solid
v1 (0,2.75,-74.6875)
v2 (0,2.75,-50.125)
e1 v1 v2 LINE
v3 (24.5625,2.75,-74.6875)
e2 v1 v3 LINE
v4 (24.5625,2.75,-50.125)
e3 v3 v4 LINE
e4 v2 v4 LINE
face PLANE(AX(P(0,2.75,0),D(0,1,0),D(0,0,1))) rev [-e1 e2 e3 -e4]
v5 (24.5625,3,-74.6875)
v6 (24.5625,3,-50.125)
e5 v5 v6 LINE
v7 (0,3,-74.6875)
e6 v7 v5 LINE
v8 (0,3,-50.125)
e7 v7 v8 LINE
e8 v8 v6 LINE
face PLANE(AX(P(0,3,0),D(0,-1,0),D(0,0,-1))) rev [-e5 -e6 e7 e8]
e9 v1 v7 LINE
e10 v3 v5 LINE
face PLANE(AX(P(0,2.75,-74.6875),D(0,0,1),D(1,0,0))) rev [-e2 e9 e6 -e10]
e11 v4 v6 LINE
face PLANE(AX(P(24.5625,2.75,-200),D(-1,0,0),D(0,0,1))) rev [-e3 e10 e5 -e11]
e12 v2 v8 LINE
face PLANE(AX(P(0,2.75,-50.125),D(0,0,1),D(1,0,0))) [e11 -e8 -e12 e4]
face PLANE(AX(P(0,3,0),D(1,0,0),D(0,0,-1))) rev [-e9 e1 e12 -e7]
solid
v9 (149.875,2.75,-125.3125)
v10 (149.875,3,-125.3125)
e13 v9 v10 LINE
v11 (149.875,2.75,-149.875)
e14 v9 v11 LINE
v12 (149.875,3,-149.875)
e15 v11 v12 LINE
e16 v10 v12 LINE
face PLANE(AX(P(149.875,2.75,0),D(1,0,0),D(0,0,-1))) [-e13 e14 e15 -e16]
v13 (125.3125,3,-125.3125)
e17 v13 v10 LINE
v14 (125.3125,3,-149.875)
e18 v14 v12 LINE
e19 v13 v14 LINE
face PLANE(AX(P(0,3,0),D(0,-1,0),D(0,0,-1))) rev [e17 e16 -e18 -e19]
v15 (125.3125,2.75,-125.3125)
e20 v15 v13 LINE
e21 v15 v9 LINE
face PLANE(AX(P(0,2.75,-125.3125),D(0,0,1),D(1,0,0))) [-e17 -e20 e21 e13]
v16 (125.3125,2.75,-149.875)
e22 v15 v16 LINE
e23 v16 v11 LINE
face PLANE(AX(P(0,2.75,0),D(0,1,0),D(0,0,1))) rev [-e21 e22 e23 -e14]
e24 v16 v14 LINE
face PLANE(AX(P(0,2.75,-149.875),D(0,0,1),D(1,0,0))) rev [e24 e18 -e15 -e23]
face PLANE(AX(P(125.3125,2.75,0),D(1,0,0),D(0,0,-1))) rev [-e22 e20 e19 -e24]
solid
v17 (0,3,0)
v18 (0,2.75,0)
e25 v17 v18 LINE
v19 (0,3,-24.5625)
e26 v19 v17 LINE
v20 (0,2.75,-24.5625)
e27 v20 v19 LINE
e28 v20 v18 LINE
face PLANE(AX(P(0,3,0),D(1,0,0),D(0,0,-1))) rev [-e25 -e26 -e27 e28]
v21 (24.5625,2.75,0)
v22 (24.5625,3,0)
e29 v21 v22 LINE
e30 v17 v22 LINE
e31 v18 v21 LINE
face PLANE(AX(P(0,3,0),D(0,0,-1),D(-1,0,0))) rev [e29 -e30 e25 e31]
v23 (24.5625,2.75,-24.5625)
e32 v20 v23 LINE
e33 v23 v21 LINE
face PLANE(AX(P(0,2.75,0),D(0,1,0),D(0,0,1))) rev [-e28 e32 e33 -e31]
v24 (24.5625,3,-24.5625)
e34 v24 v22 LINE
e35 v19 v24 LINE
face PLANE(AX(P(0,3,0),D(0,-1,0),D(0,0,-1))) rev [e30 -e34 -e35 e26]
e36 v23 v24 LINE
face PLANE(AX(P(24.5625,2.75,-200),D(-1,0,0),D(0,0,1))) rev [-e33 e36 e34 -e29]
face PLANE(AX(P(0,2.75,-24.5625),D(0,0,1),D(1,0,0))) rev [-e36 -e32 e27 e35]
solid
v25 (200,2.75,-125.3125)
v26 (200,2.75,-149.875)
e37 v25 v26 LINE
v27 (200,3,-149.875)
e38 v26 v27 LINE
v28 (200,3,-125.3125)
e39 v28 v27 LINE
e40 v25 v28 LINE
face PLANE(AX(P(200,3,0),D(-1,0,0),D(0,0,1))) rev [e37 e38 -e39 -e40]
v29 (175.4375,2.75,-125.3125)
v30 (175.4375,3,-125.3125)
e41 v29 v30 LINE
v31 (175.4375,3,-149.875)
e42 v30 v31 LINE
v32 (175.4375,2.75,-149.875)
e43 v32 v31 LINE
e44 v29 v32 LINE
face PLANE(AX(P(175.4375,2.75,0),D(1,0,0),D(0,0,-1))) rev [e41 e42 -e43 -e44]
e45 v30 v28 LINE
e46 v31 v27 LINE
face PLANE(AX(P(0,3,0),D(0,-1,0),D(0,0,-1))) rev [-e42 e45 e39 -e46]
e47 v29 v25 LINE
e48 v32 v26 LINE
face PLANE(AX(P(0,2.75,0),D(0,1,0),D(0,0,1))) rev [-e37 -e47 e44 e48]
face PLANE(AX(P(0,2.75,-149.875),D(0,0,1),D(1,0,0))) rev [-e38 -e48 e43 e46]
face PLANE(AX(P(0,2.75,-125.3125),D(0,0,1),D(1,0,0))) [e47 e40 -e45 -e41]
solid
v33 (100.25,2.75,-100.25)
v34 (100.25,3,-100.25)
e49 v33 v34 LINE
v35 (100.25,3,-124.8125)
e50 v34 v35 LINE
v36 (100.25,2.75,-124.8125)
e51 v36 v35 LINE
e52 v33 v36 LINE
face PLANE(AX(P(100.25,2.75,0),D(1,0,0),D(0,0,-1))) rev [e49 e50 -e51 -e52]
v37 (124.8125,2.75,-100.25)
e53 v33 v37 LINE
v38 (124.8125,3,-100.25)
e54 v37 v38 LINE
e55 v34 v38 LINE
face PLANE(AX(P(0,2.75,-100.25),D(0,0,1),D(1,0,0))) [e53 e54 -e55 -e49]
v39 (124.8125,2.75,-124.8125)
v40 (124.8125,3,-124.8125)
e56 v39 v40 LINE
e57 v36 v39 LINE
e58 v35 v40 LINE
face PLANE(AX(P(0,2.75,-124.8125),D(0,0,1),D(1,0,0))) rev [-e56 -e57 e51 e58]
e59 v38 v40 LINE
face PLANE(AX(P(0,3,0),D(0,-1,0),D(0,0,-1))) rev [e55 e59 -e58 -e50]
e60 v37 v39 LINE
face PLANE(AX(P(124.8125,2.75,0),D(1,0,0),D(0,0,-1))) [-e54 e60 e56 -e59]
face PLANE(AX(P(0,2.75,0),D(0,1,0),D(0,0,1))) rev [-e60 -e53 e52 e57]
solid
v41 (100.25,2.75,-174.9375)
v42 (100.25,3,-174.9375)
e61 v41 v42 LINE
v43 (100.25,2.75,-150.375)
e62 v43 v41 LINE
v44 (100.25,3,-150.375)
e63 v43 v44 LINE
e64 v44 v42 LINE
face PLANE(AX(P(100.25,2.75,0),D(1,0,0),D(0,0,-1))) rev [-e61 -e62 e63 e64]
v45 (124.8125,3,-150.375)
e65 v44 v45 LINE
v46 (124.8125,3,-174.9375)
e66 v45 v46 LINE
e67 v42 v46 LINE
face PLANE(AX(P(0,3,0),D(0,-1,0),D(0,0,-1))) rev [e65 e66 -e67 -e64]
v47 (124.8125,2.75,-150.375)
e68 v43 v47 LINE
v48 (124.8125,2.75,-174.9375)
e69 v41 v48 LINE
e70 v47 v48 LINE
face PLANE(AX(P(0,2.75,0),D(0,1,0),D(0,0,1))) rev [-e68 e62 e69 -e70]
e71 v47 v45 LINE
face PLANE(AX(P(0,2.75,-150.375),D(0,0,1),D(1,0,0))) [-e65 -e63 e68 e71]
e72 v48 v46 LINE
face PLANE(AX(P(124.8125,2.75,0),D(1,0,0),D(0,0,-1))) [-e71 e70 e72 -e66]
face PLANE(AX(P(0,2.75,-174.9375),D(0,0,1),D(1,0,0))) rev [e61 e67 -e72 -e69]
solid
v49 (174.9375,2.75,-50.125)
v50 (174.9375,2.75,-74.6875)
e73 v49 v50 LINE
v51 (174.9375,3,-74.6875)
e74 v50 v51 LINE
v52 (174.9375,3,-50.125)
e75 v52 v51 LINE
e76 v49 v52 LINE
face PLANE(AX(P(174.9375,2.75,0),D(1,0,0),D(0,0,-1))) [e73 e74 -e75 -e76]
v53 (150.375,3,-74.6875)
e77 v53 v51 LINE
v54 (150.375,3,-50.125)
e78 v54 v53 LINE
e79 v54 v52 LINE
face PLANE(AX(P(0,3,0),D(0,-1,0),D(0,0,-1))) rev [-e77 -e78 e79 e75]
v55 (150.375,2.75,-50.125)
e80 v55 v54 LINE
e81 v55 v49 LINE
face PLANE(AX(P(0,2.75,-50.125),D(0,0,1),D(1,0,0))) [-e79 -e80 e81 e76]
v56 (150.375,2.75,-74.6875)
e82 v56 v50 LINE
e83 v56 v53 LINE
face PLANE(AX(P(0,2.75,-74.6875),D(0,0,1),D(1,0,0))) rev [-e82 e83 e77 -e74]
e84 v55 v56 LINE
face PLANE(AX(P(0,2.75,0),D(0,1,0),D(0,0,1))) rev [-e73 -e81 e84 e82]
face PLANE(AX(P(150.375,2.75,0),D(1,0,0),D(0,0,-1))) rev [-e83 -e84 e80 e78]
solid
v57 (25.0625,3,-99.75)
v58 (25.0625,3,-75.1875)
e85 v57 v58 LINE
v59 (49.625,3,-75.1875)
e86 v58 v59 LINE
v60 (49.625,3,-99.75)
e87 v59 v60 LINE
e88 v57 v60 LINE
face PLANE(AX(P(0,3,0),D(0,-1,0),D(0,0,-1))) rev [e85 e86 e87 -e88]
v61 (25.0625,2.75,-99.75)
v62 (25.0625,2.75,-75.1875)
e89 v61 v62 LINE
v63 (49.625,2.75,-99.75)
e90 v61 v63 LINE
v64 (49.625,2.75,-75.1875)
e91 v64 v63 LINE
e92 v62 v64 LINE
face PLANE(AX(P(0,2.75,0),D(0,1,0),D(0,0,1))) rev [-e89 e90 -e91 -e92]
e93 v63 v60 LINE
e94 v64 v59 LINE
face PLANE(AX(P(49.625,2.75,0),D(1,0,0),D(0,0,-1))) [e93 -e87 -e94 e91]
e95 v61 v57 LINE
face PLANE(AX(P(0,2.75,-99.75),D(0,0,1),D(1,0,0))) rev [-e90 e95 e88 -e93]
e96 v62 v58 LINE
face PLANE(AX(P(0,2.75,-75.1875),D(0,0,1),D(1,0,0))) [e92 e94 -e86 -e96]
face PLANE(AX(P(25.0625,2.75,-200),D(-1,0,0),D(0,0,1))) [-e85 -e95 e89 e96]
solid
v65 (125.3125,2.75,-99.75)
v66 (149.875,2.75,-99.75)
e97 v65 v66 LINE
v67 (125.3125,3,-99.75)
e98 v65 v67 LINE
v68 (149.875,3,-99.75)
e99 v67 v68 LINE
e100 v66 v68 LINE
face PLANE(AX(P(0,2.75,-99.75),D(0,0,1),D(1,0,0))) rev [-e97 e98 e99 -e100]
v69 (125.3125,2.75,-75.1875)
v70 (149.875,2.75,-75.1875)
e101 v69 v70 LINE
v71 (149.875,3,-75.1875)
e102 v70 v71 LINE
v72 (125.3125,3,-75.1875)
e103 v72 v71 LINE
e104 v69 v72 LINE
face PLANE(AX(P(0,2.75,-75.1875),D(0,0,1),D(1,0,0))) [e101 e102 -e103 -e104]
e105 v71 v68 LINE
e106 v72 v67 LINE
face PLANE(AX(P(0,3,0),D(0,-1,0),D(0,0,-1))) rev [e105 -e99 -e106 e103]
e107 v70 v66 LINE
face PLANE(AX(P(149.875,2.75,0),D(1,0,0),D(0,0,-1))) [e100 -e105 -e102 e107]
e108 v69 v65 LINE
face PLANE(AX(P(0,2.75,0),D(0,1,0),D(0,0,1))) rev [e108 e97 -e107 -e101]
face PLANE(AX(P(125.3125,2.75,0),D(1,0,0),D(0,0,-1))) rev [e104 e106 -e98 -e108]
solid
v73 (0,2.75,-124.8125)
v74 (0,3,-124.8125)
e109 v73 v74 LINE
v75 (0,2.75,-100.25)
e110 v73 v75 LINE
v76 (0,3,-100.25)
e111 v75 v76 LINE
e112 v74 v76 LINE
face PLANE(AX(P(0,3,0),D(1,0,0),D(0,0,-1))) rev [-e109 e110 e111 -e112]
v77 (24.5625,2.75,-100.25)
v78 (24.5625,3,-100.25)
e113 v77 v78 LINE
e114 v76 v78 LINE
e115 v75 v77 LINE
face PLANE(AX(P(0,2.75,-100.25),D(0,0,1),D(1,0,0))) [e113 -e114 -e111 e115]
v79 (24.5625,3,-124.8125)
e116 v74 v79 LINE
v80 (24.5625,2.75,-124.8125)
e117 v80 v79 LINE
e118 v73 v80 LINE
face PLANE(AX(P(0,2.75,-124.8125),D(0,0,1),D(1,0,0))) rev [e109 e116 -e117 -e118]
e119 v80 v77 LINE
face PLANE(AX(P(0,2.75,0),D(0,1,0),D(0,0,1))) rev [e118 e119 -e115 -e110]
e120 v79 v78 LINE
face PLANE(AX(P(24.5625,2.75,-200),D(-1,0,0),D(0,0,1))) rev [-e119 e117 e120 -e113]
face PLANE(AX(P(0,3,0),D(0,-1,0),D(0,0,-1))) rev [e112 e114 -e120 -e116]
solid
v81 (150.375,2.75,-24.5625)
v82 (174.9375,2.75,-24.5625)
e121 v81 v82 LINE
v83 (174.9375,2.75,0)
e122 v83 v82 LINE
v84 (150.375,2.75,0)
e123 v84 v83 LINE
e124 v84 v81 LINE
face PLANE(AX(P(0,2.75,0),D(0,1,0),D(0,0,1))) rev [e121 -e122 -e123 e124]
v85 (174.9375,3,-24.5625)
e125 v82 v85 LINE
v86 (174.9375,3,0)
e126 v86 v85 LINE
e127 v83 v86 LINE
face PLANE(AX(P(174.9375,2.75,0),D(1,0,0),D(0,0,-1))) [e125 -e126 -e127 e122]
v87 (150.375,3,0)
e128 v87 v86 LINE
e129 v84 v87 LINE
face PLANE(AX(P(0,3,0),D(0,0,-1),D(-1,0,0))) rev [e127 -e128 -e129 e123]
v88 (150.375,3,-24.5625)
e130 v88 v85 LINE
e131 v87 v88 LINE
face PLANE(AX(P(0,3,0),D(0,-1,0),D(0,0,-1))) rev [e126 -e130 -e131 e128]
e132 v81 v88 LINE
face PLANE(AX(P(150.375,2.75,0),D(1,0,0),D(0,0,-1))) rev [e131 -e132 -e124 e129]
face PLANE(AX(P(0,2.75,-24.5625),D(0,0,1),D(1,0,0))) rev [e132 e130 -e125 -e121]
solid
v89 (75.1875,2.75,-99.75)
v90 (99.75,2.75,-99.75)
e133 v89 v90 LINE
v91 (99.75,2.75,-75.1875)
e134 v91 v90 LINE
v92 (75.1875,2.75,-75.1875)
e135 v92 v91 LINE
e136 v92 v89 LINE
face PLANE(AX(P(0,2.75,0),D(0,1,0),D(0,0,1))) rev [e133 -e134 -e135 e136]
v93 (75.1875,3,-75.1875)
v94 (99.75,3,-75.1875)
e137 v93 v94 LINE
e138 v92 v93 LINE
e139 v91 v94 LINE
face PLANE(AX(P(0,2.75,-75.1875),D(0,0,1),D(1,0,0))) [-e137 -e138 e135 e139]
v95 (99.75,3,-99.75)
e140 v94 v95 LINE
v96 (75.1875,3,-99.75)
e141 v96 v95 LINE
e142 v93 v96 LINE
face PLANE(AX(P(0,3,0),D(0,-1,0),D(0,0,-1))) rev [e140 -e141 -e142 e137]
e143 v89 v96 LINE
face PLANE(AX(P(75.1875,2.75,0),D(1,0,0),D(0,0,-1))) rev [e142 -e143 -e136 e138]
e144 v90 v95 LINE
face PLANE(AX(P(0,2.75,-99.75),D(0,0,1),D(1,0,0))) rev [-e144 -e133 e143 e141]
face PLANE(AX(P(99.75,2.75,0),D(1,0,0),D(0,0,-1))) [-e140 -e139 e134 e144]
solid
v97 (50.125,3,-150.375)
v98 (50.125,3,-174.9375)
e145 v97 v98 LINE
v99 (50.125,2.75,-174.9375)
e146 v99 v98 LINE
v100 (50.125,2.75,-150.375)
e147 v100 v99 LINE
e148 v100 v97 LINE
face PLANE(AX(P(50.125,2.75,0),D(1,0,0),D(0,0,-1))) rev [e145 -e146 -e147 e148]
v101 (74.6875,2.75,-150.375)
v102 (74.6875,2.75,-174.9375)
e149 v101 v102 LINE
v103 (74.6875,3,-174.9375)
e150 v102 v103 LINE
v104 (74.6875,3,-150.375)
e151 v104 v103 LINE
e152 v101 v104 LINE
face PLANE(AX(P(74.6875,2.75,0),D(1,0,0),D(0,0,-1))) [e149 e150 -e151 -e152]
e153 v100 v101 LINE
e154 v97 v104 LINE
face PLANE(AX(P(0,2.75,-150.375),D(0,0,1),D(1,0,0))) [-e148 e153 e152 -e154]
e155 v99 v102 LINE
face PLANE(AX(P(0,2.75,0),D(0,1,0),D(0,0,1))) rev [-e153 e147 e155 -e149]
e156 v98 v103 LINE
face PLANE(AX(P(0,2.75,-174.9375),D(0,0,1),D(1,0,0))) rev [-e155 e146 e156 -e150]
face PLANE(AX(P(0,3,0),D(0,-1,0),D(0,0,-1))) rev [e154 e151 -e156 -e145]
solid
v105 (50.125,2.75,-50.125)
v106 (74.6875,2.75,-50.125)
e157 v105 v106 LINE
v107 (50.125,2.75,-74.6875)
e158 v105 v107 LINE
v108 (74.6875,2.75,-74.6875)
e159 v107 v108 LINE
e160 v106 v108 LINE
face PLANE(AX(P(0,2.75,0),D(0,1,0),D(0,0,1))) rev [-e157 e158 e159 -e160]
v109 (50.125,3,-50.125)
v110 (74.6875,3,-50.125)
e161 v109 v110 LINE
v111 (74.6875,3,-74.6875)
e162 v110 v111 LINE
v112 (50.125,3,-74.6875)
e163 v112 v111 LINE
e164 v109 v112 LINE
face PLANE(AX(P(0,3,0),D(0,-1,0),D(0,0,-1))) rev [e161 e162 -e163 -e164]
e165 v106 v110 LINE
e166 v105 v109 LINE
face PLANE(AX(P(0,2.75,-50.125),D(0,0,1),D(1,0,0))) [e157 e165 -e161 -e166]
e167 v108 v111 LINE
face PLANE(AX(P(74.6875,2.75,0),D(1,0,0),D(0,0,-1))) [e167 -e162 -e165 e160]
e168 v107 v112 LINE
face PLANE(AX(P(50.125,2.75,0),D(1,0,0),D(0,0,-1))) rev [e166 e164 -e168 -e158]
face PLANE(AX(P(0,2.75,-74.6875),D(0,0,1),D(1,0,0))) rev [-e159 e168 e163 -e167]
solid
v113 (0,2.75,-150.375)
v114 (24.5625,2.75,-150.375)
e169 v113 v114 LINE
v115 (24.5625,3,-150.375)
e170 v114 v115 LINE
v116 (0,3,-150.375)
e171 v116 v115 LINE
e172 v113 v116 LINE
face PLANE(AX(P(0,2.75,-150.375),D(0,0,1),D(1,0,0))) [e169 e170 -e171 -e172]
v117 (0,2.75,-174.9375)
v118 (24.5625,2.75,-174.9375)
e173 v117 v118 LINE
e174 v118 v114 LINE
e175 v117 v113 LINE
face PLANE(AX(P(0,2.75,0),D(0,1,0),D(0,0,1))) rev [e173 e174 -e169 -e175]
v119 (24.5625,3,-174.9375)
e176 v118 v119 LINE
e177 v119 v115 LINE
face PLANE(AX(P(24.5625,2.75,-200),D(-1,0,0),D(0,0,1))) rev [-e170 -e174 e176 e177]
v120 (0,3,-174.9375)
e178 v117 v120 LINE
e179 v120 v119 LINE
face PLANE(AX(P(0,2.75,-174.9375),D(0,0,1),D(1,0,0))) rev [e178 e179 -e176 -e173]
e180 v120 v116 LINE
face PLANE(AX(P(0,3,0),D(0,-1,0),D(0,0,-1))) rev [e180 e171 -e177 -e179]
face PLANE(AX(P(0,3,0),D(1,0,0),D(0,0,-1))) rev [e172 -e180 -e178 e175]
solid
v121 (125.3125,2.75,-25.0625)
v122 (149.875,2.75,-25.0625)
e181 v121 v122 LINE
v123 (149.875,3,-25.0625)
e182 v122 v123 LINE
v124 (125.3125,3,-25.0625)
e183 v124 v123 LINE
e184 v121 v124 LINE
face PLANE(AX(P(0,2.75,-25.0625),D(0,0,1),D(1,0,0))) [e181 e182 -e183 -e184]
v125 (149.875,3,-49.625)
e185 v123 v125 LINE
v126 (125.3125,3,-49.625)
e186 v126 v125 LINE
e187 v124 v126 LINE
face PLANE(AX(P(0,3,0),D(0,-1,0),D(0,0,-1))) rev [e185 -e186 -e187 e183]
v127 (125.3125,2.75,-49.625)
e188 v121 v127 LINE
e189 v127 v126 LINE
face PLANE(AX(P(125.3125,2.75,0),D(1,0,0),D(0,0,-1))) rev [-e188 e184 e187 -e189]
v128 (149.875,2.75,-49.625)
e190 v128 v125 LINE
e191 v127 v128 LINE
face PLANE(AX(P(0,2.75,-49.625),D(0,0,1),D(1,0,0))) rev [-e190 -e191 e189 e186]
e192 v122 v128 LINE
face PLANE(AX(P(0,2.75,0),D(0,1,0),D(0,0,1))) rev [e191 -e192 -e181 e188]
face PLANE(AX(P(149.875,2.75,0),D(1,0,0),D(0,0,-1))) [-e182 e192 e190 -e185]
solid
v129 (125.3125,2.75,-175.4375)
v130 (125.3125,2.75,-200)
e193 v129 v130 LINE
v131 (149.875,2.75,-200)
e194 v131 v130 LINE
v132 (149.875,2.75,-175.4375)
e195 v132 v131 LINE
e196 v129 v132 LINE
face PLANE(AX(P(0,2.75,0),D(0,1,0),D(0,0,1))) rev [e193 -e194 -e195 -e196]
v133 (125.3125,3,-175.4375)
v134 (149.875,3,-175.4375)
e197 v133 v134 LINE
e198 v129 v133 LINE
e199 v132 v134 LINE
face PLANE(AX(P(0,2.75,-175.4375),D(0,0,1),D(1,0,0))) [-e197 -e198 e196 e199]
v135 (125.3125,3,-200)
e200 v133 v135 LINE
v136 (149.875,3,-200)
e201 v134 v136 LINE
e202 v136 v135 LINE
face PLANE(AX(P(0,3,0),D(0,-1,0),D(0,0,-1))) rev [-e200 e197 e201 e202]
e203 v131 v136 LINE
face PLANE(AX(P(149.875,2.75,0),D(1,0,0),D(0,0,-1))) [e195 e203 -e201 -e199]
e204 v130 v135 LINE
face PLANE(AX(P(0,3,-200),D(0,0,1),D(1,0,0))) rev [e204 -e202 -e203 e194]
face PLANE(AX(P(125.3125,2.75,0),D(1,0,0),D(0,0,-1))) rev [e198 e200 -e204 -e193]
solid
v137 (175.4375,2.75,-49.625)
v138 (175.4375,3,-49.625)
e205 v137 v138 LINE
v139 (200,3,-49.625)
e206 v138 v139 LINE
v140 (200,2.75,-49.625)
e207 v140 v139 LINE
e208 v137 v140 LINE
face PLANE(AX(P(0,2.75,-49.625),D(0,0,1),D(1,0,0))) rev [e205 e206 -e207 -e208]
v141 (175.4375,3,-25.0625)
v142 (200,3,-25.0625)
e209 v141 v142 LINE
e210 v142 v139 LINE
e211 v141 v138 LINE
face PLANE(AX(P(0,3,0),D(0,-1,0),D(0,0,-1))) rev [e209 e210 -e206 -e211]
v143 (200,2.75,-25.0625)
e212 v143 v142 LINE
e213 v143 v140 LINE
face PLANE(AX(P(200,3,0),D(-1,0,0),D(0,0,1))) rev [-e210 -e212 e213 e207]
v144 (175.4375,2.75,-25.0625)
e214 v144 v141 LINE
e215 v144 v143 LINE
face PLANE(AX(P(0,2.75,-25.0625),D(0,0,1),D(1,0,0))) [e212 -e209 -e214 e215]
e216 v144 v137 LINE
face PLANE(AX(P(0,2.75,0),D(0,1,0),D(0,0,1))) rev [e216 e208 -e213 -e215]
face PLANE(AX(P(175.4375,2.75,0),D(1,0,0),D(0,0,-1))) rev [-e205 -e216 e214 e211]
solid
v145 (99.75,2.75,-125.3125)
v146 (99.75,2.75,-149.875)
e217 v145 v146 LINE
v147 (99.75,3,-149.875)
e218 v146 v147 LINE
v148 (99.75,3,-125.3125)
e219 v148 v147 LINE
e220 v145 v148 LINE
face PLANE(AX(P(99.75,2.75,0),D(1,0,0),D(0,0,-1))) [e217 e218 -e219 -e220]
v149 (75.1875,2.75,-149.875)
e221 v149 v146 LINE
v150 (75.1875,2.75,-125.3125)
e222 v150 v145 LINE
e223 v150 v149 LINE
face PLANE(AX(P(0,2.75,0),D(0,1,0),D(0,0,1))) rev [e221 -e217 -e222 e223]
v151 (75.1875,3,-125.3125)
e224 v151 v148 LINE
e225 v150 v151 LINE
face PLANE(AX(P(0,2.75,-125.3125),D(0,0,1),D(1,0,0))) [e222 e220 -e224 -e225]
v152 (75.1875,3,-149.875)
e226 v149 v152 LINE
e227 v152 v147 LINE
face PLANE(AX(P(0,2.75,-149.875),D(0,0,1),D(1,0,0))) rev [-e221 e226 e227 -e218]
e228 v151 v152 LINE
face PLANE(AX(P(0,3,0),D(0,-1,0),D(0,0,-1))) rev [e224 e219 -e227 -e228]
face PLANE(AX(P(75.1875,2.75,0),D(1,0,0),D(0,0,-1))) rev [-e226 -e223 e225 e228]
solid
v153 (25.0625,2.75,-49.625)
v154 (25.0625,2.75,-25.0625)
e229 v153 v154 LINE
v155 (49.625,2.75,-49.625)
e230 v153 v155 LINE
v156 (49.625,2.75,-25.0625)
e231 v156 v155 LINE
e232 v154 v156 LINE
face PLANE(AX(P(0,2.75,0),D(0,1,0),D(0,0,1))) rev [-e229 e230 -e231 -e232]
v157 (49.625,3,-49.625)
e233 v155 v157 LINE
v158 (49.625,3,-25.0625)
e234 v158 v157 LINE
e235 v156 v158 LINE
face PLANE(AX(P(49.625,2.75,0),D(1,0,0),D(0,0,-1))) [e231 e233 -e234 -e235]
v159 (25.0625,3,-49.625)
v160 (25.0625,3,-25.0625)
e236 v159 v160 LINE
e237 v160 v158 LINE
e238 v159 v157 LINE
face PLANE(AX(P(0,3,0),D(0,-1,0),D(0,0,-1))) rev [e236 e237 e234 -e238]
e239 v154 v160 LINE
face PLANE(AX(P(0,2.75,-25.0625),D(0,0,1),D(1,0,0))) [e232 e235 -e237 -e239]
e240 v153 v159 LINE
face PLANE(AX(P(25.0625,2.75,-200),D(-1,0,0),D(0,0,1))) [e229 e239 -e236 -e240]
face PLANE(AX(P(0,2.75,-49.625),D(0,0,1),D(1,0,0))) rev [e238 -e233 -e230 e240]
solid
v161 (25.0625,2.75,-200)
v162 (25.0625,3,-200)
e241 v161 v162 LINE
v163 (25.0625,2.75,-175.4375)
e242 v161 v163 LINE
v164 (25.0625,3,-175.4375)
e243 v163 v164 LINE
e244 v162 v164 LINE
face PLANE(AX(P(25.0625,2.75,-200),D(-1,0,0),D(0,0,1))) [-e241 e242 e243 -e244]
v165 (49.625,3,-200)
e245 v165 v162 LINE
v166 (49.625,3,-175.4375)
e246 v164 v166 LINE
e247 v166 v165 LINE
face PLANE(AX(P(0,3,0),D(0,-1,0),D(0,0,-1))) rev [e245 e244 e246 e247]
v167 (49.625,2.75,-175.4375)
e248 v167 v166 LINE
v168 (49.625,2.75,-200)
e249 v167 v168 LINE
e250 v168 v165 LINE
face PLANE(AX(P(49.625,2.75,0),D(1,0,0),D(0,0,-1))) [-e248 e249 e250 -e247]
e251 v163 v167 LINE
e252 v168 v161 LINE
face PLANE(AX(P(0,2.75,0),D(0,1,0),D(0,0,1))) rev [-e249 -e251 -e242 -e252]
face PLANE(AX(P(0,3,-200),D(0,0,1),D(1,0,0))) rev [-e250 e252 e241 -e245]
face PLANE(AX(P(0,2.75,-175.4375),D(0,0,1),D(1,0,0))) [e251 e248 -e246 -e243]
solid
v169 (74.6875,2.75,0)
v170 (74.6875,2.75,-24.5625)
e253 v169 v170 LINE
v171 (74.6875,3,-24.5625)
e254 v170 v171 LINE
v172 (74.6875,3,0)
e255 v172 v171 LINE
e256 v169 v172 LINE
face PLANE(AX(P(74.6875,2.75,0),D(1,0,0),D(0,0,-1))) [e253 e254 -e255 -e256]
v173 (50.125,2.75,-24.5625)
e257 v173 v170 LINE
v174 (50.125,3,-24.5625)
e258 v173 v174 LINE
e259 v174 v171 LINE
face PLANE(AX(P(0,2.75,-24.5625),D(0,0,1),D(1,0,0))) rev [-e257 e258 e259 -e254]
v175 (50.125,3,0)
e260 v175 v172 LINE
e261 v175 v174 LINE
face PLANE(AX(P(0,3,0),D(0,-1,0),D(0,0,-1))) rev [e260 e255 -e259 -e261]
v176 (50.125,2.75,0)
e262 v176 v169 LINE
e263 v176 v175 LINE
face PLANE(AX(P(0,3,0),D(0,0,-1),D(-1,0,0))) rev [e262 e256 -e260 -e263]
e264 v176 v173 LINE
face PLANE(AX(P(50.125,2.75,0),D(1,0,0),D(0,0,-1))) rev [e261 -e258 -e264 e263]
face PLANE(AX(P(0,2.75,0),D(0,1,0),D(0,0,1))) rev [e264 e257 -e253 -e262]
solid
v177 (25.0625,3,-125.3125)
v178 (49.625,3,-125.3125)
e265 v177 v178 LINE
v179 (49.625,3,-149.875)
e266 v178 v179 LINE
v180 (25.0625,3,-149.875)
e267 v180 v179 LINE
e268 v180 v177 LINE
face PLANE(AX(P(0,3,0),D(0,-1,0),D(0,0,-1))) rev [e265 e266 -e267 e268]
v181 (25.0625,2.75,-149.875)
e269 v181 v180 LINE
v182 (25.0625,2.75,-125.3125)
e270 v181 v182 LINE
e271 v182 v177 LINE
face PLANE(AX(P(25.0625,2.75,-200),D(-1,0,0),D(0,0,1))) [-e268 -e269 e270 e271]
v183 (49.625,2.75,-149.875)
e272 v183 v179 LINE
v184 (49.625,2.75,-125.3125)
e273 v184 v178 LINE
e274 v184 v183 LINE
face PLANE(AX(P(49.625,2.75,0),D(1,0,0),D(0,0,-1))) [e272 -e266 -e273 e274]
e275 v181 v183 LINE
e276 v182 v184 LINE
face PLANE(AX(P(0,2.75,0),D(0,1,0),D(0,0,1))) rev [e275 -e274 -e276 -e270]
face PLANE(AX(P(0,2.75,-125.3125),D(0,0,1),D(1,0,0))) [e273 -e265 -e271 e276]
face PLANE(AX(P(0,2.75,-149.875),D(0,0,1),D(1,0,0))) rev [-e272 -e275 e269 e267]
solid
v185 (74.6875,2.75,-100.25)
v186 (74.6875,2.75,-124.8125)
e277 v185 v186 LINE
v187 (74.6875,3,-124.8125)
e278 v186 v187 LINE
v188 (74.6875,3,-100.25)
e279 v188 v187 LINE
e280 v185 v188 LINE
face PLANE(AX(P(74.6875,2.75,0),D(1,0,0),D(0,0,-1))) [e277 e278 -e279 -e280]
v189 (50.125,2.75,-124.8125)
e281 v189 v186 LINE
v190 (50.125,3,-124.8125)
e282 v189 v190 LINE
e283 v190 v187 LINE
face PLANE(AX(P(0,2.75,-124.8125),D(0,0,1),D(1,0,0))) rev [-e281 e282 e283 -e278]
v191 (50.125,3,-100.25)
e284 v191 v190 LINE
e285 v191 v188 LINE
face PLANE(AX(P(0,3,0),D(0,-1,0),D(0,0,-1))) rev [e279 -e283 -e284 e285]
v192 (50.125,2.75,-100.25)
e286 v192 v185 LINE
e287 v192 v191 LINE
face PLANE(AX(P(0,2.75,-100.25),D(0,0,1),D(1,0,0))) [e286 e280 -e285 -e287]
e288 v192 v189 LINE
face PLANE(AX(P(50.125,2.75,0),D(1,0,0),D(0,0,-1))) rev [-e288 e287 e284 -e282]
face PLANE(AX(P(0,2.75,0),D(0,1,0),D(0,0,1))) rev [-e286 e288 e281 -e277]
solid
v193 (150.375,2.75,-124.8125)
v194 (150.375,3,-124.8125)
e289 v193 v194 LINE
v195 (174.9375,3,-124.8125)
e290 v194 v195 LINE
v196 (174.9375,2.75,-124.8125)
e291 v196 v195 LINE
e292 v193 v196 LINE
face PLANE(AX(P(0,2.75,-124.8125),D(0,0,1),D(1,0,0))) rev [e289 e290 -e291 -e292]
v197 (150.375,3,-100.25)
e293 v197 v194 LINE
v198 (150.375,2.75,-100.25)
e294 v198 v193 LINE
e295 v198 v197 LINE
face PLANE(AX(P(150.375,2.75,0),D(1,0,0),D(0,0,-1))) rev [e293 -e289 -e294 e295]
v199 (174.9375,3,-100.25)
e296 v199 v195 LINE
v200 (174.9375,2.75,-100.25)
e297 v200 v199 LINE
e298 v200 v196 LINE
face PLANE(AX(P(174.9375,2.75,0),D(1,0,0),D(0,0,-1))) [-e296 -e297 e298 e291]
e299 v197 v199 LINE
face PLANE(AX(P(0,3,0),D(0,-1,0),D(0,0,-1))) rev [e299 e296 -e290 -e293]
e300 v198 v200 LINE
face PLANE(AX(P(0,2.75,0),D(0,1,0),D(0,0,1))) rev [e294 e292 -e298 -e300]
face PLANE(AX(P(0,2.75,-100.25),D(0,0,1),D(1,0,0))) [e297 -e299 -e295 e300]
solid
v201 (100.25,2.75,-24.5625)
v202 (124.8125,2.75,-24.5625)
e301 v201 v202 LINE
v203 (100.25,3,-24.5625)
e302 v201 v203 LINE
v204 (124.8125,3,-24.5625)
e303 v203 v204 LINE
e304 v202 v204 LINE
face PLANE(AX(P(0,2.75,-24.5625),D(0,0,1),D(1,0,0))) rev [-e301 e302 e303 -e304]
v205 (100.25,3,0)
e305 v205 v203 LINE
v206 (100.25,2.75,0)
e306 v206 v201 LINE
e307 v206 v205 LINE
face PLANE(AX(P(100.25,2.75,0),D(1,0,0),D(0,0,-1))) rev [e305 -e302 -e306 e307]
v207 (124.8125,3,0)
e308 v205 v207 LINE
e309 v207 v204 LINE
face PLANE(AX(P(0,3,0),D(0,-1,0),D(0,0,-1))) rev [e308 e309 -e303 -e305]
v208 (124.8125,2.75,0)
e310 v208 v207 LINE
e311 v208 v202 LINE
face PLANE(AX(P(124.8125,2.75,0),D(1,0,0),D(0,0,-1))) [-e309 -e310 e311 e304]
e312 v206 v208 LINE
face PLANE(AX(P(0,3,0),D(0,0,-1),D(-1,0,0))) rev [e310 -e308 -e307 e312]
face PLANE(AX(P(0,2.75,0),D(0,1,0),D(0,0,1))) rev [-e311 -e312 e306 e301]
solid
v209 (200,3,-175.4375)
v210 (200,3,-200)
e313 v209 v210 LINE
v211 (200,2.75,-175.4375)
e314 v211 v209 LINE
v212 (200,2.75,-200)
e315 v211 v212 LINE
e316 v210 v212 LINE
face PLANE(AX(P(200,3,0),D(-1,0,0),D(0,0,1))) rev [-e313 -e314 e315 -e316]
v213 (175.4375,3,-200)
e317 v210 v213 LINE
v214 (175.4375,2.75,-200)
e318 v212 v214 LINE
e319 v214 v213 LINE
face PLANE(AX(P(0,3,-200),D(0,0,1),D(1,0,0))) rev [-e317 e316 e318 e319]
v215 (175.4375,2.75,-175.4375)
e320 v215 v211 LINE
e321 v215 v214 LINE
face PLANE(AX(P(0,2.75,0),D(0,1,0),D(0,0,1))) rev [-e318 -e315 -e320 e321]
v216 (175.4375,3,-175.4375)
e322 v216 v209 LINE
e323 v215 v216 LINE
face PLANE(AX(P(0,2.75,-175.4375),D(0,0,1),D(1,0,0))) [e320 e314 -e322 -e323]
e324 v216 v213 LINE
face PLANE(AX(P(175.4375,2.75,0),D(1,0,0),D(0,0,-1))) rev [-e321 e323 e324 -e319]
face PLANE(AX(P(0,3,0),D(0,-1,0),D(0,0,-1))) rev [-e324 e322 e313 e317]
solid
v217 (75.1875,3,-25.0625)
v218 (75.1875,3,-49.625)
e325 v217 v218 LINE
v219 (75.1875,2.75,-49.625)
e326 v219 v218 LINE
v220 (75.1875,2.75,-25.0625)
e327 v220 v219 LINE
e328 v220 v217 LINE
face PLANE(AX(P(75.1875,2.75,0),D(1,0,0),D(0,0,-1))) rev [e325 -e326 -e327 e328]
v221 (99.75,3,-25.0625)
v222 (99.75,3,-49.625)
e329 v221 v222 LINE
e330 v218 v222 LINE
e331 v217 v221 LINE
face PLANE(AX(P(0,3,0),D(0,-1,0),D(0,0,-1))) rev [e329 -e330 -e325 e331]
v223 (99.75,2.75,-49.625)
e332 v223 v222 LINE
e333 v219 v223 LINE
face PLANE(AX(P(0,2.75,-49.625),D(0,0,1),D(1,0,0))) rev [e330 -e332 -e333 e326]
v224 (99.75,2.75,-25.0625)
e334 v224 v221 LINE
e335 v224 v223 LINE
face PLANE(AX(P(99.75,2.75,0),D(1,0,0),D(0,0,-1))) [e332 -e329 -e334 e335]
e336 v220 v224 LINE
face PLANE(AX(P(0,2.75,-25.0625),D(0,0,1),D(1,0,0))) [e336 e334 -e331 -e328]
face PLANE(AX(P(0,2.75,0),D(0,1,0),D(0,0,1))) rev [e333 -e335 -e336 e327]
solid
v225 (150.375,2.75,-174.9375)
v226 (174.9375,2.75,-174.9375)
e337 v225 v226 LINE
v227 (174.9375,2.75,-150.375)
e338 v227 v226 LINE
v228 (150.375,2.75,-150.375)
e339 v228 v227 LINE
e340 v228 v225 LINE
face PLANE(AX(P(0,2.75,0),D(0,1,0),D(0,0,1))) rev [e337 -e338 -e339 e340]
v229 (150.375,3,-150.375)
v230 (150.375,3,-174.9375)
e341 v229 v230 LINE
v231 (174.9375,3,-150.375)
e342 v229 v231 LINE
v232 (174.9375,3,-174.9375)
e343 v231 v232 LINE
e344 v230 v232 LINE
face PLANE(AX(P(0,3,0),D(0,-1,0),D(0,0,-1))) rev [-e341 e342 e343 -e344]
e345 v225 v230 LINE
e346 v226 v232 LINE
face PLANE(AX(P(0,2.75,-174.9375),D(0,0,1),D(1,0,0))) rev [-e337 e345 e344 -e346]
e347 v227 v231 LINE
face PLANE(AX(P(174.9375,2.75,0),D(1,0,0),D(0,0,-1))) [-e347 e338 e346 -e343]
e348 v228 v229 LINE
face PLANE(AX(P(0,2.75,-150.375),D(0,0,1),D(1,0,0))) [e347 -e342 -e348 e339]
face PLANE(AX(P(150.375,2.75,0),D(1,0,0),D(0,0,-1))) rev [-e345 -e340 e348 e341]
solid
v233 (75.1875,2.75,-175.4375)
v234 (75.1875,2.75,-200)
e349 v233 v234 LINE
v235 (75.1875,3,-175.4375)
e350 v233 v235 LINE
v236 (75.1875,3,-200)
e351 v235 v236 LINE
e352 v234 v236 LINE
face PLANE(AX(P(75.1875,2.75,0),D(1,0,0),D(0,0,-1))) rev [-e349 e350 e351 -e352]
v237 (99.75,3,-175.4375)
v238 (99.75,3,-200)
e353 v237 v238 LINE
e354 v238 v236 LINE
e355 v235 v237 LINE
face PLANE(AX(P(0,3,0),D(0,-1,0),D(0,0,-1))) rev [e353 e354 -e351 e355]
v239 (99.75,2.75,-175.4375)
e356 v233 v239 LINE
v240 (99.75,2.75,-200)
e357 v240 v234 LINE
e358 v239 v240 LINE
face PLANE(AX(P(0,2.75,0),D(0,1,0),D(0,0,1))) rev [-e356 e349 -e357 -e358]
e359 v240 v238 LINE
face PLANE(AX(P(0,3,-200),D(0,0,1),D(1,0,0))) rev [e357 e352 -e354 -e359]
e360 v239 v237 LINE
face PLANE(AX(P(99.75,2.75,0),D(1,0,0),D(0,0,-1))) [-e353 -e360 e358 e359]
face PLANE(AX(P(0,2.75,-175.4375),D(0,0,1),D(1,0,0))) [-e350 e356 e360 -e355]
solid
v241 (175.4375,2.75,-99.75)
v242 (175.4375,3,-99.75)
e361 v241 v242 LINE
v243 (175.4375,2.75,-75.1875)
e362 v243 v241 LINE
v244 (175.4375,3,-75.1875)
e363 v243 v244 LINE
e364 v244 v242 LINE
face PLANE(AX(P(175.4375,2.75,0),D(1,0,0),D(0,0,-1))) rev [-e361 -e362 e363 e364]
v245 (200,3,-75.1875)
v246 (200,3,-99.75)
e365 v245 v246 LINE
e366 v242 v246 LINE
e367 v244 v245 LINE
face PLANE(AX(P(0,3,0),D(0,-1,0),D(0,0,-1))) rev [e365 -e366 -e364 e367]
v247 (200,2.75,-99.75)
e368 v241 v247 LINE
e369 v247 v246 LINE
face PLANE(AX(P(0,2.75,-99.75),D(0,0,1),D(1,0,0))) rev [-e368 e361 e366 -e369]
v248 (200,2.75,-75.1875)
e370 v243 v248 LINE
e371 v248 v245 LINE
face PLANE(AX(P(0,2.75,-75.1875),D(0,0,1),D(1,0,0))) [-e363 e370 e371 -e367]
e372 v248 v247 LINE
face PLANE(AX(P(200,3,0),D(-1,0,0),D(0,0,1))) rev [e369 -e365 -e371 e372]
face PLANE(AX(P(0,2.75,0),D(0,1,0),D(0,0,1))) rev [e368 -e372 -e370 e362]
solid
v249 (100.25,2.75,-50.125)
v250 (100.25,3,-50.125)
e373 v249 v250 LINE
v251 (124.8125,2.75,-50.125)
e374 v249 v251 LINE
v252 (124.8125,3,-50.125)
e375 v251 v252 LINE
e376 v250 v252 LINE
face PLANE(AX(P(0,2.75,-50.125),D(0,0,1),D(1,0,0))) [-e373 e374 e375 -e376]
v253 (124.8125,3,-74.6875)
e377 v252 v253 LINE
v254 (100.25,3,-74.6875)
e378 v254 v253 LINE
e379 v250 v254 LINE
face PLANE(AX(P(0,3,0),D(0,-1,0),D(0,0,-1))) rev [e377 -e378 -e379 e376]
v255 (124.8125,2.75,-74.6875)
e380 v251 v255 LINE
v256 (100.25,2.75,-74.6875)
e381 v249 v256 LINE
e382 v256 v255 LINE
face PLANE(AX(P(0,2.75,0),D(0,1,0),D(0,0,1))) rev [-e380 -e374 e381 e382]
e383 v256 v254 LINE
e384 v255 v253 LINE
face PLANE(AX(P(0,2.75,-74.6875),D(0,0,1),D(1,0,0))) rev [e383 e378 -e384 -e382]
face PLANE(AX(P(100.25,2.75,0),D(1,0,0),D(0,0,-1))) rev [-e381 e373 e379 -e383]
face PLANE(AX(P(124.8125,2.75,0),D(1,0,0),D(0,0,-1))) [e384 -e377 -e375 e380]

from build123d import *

# Parameters (mm, degrees)
SKETCH1_W                = 200
SKETCH1_H                = 200
BOSS_EXTRUDE1_DEPTH      = 3
SKETCH2_W                = 24.5625
SKETCH2_H                = 24.5625
CUT_EXTRUDE1_DEPTH       = 0.25
SKETCH4_W                = 4.4
SKETCH4_H                = 3.5
SKETCH4_W_2              = 3.9
SKETCH4_H_2              = 3
SKETCH4_W_3              = 1.95
SKETCH4_H_3              = 1.5
CUT_EXTRUDE2_DEPTH       = 1.5
CUT_EXTRUDE3_START       = -2.75
CUT_EXTRUDE3_OUTLINE_W   = 200
CUT_EXTRUDE3_OUTLINE_H   = 200
CUT_EXTRUDE3_DEPTH       = 2.75
CUT_EXTRUDE3_START_2     = -3
CUT_EXTRUDE3_2_OUTLINE_W = 24.5625
CUT_EXTRUDE3_2_OUTLINE_H = 24.5625
CUT_EXTRUDE3_2_DEPTH     = 0.25


# Read off the part's stored shape, not the designer's step: Cut-Extrude3
with BuildPart() as part:
    # Sketch1 → Boss-Extrude1 (new body)
    with BuildSketch(Plane(origin=(0, 0, 0), x_dir=(1, 0, 0), z_dir=(0, 1, 0))):
        with Locations((100, 100)):
            Rectangle(SKETCH1_W, SKETCH1_H)
    extrude(amount=BOSS_EXTRUDE1_DEPTH)

    # Sketch2 → Cut-Extrude1 (cut)
    with BuildSketch(Plane(origin=(0, 3, 0), x_dir=(1, 0, 0), z_dir=(0, 1, 0))):
        Polygon((150.375, 24.5625), (174.9375, 24.5625), (174.9375, 0), (175.4375, 0), (175.4375, 24.5625), (200, 24.5625), (200, 25.0625), (175.4375, 25.0625), (175.4375, 49.625), (200, 49.625), (200, 50.125), (175.4375, 50.125), (175.4375, 74.6875), (200, 74.6875), (200, 75.1875), (175.4375, 75.1875), (175.4375, 99.75), (200, 99.75), (200, 100.25), (175.4375, 100.25), (175.4375, 124.8125), (200, 124.8125), (200, 125.3125), (175.4375, 125.3125), (175.4375, 149.875), (200, 149.875), (200, 150.375), (175.4375, 150.375), (175.4375, 174.9375), (200, 174.9375), (200, 175.4375), (175.4375, 175.4375), (175.4375, 200), (174.9375, 200), (174.9375, 175.4375), (150.375, 175.4375), (150.375, 200), (149.875, 200), (149.875, 175.4375), (125.3125, 175.4375), (125.3125, 200), (124.8125, 200), (124.8125, 175.4375), (100.25, 175.4375), (100.25, 200), (99.75, 200), (99.75, 175.4375), (75.1875, 175.4375), (75.1875, 200), (74.6875, 200), (74.6875, 175.4375), (50.125, 175.4375), (50.125, 200), (49.625, 200), (49.625, 175.4375), (25.0625, 175.4375), (25.0625, 200), (24.5625, 200), (24.5625, 175.4375), (0, 175.4375), (0, 174.9375), (24.5625, 174.9375), (24.5625, 150.375), (0, 150.375), (0, 149.875), (24.5625, 149.875), (24.5625, 125.3125), (0, 125.3125), (0, 124.8125), (24.5625, 124.8125), (24.5625, 100.25), (0, 100.25), (0, 99.75), (24.5625, 99.75), (24.5625, 75.1875), (0, 75.1875), (0, 74.6875), (24.5625, 74.6875), (24.5625, 50.125), (0, 50.125), (0, 49.625), (24.5625, 49.625), (24.5625, 25.0625), (0, 25.0625), (0, 24.5625), (24.5625, 24.5625), (24.5625, 0), (25.0625, 0), (25.0625, 24.5625), (49.625, 24.5625), (49.625, 0), (50.125, 0), (50.125, 24.5625), (74.6875, 24.5625), (74.6875, 0), (75.1875, 0), (75.1875, 24.5625), (99.75, 24.5625), (99.75, 0), (100.25, 0), (100.25, 24.5625), (124.8125, 24.5625), (124.8125, 0), (125.3125, 0), (125.3125, 24.5625), (149.875, 24.5625), (149.875, 0), (150.375, 0), align=None)
        with Locations((37.34375, 37.34375)):
            Rectangle(SKETCH2_W, SKETCH2_H, mode=Mode.SUBTRACT)
        with Locations((62.40625, 37.34375)):
            Rectangle(SKETCH2_W, SKETCH2_H, mode=Mode.SUBTRACT)
        with Locations((37.34375, 62.40625)):
            Rectangle(SKETCH2_W, SKETCH2_H, mode=Mode.SUBTRACT)
        with Locations((62.40625, 62.40625)):
            Rectangle(SKETCH2_W, SKETCH2_H, mode=Mode.SUBTRACT)
        with Locations((87.46875, 37.34375)):
            Rectangle(SKETCH2_W, SKETCH2_H, mode=Mode.SUBTRACT)
        with Locations((87.46875, 62.40625)):
            Rectangle(SKETCH2_W, SKETCH2_H, mode=Mode.SUBTRACT)
        with Locations((37.34375, 87.46875)):
            Rectangle(SKETCH2_W, SKETCH2_H, mode=Mode.SUBTRACT)
        with Locations((62.40625, 87.46875)):
            Rectangle(SKETCH2_W, SKETCH2_H, mode=Mode.SUBTRACT)
        with Locations((87.46875, 87.46875)):
            Rectangle(SKETCH2_W, SKETCH2_H, mode=Mode.SUBTRACT)
        with Locations((112.53125, 37.34375)):
            Rectangle(SKETCH2_W, SKETCH2_H, mode=Mode.SUBTRACT)
        with Locations((112.53125, 62.40625)):
            Rectangle(SKETCH2_W, SKETCH2_H, mode=Mode.SUBTRACT)
        with Locations((137.59375, 37.34375)):
            Rectangle(SKETCH2_W, SKETCH2_H, mode=Mode.SUBTRACT)
        with Locations((162.65625, 37.34375)):
            Rectangle(SKETCH2_W, SKETCH2_H, mode=Mode.SUBTRACT)
        with Locations((137.59375, 62.40625)):
            Rectangle(SKETCH2_W, SKETCH2_H, mode=Mode.SUBTRACT)
        with Locations((162.65625, 62.40625)):
            Rectangle(SKETCH2_W, SKETCH2_H, mode=Mode.SUBTRACT)
        with Locations((112.53125, 87.46875)):
            Rectangle(SKETCH2_W, SKETCH2_H, mode=Mode.SUBTRACT)
        with Locations((137.59375, 87.46875)):
            Rectangle(SKETCH2_W, SKETCH2_H, mode=Mode.SUBTRACT)
        with Locations((162.65625, 87.46875)):
            Rectangle(SKETCH2_W, SKETCH2_H, mode=Mode.SUBTRACT)
        with Locations((37.34375, 112.53125)):
            Rectangle(SKETCH2_W, SKETCH2_H, mode=Mode.SUBTRACT)
        with Locations((62.40625, 112.53125)):
            Rectangle(SKETCH2_W, SKETCH2_H, mode=Mode.SUBTRACT)
        with Locations((87.46875, 112.53125)):
            Rectangle(SKETCH2_W, SKETCH2_H, mode=Mode.SUBTRACT)
        with Locations((37.34375, 137.59375)):
            Rectangle(SKETCH2_W, SKETCH2_H, mode=Mode.SUBTRACT)
        with Locations((62.40625, 137.59375)):
            Rectangle(SKETCH2_W, SKETCH2_H, mode=Mode.SUBTRACT)
        with Locations((37.34375, 162.65625)):
            Rectangle(SKETCH2_W, SKETCH2_H, mode=Mode.SUBTRACT)
        with Locations((62.40625, 162.65625)):
            Rectangle(SKETCH2_W, SKETCH2_H, mode=Mode.SUBTRACT)
        with Locations((87.46875, 137.59375)):
            Rectangle(SKETCH2_W, SKETCH2_H, mode=Mode.SUBTRACT)
        with Locations((87.46875, 162.65625)):
            Rectangle(SKETCH2_W, SKETCH2_H, mode=Mode.SUBTRACT)
        with Locations((112.53125, 112.53125)):
            Rectangle(SKETCH2_W, SKETCH2_H, mode=Mode.SUBTRACT)
        with Locations((137.59375, 112.53125)):
            Rectangle(SKETCH2_W, SKETCH2_H, mode=Mode.SUBTRACT)
        with Locations((162.65625, 112.53125)):
            Rectangle(SKETCH2_W, SKETCH2_H, mode=Mode.SUBTRACT)
        with Locations((112.53125, 137.59375)):
            Rectangle(SKETCH2_W, SKETCH2_H, mode=Mode.SUBTRACT)
        with Locations((112.53125, 162.65625)):
            Rectangle(SKETCH2_W, SKETCH2_H, mode=Mode.SUBTRACT)
        with Locations((137.59375, 137.59375)):
            Rectangle(SKETCH2_W, SKETCH2_H, mode=Mode.SUBTRACT)
        with Locations((162.65625, 137.59375)):
            Rectangle(SKETCH2_W, SKETCH2_H, mode=Mode.SUBTRACT)
        with Locations((137.59375, 162.65625)):
            Rectangle(SKETCH2_W, SKETCH2_H, mode=Mode.SUBTRACT)
        with Locations((162.65625, 162.65625)):
            Rectangle(SKETCH2_W, SKETCH2_H, mode=Mode.SUBTRACT)
    extrude(amount=-CUT_EXTRUDE1_DEPTH, mode=Mode.SUBTRACT)

    # Sketch4 → Cut-Extrude2 (cut)
    # profile 1 of 68: a face of its own
    with BuildSketch(Plane.XZ):
        with Locations((37.3425, -162.6575)):
            Rectangle(SKETCH4_W, SKETCH4_H)
    # profile 2 of 68: a face of its own
    with BuildSketch(Plane.XZ):
        with Locations((12.28, -162.6575)):
            Rectangle(SKETCH4_W, SKETCH4_H)
    # profile 3 of 68: a face of its own
    with BuildSketch(Plane.XZ):
        with Locations((12.28, -187.72)):
            Rectangle(SKETCH4_W, SKETCH4_H)
        with Locations((12.28, -187.72)):
            Rectangle(SKETCH4_W_2, SKETCH4_H_2, mode=Mode.SUBTRACT)
    # profile 4 of 68: a face of its own
    with BuildSketch(Plane.XZ):
        with Locations((13.255, -188.47)):
            Rectangle(SKETCH4_W_3, SKETCH4_H_3)
    # profile 5 of 68: a face of its own
    with BuildSketch(Plane.XZ):
        with Locations((13.255, -186.97)):
            Rectangle(SKETCH4_W_3, SKETCH4_H_3)
    # profile 6 of 68: a face of its own
    with BuildSketch(Plane.XZ):
        with Locations((11.305, -186.97)):
            Rectangle(SKETCH4_W_3, SKETCH4_H_3)
    # profile 7 of 68: a face of its own
    with BuildSketch(Plane.XZ):
        with Locations((11.305, -188.47)):
            Rectangle(SKETCH4_W_3, SKETCH4_H_3)
    # profile 8 of 68: a face of its own
    with BuildSketch(Plane.XZ):
        with Locations((37.3425, -187.72)):
            Rectangle(SKETCH4_W, SKETCH4_H)
    # profile 9 of 68: a face of its own
    with BuildSketch(Plane.XZ):
        with Locations((62.405, -187.72)):
            Rectangle(SKETCH4_W, SKETCH4_H)
    # profile 10 of 68: a face of its own
    with BuildSketch(Plane.XZ):
        with Locations((87.4675, -187.72)):
            Rectangle(SKETCH4_W, SKETCH4_H)
    # profile 11 of 68: a face of its own
    with BuildSketch(Plane.XZ):
        with Locations((112.53, -187.72)):
            Rectangle(SKETCH4_W, SKETCH4_H)
    # profile 12 of 68: a face of its own
    with BuildSketch(Plane.XZ):
        with Locations((137.5925, -187.72)):
            Rectangle(SKETCH4_W, SKETCH4_H)
    # profile 13 of 68: a face of its own
    with BuildSketch(Plane.XZ):
        with Locations((162.655, -187.72)):
            Rectangle(SKETCH4_W, SKETCH4_H)
    # profile 14 of 68: a face of its own
    with BuildSketch(Plane.XZ):
        with Locations((187.7175, -187.72)):
            Rectangle(SKETCH4_W, SKETCH4_H)
    # profile 15 of 68: a face of its own
    with BuildSketch(Plane.XZ):
        with Locations((187.7175, -162.6575)):
            Rectangle(SKETCH4_W, SKETCH4_H)
    # profile 16 of 68: a face of its own
    with BuildSketch(Plane.XZ):
        with Locations((162.655, -162.6575)):
            Rectangle(SKETCH4_W, SKETCH4_H)
    # profile 17 of 68: a face of its own
    with BuildSketch(Plane.XZ):
        with Locations((137.5925, -162.6575)):
            Rectangle(SKETCH4_W, SKETCH4_H)
    # profile 18 of 68: a face of its own
    with BuildSketch(Plane.XZ):
        with Locations((112.53, -162.6575)):
            Rectangle(SKETCH4_W, SKETCH4_H)
    # profile 19 of 68: a face of its own
    with BuildSketch(Plane.XZ):
        with Locations((87.4675, -162.6575)):
            Rectangle(SKETCH4_W, SKETCH4_H)
    # profile 20 of 68: a face of its own
    with BuildSketch(Plane.XZ):
        with Locations((62.405, -162.6575)):
            Rectangle(SKETCH4_W, SKETCH4_H)
    # profile 21 of 68: a face of its own
    with BuildSketch(Plane.XZ):
        with Locations((12.28, -137.595)):
            Rectangle(SKETCH4_W, SKETCH4_H)
    # profile 22 of 68: a face of its own
    with BuildSketch(Plane.XZ):
        with Locations((37.3425, -137.595)):
            Rectangle(SKETCH4_W, SKETCH4_H)
    # profile 23 of 68: a face of its own
    with BuildSketch(Plane.XZ):
        with Locations((62.405, -137.595)):
            Rectangle(SKETCH4_W, SKETCH4_H)
    # profile 24 of 68: a face of its own
    with BuildSketch(Plane.XZ):
        with Locations((87.4675, -137.595)):
            Rectangle(SKETCH4_W, SKETCH4_H)
    # profile 25 of 68: a face of its own
    with BuildSketch(Plane.XZ):
        with Locations((112.53, -137.595)):
            Rectangle(SKETCH4_W, SKETCH4_H)
    # profile 26 of 68: a face of its own
    with BuildSketch(Plane.XZ):
        with Locations((137.5925, -137.595)):
            Rectangle(SKETCH4_W, SKETCH4_H)
    # profile 27 of 68: a face of its own
    with BuildSketch(Plane.XZ):
        with Locations((162.655, -137.595)):
            Rectangle(SKETCH4_W, SKETCH4_H)
    # profile 28 of 68: a face of its own
    with BuildSketch(Plane.XZ):
        with Locations((187.7175, -137.595)):
            Rectangle(SKETCH4_W, SKETCH4_H)
    # profile 29 of 68: a face of its own
    with BuildSketch(Plane.XZ):
        with Locations((187.7175, -112.5325)):
            Rectangle(SKETCH4_W, SKETCH4_H)
    # profile 30 of 68: a face of its own
    with BuildSketch(Plane.XZ):
        with Locations((162.655, -112.5325)):
            Rectangle(SKETCH4_W, SKETCH4_H)
    # profile 31 of 68: a face of its own
    with BuildSketch(Plane.XZ):
        with Locations((137.5925, -112.5325)):
            Rectangle(SKETCH4_W, SKETCH4_H)
    # profile 32 of 68: a face of its own
    with BuildSketch(Plane.XZ):
        with Locations((112.53, -112.5325)):
            Rectangle(SKETCH4_W, SKETCH4_H)
    # profile 33 of 68: a face of its own
    with BuildSketch(Plane.XZ):
        with Locations((87.4675, -112.5325)):
            Rectangle(SKETCH4_W, SKETCH4_H)
    # profile 34 of 68: a face of its own
    with BuildSketch(Plane.XZ):
        with Locations((62.405, -112.5325)):
            Rectangle(SKETCH4_W, SKETCH4_H)
    # profile 35 of 68: a face of its own
    with BuildSketch(Plane.XZ):
        with Locations((37.3425, -112.5325)):
            Rectangle(SKETCH4_W, SKETCH4_H)
    # profile 36 of 68: a face of its own
    with BuildSketch(Plane.XZ):
        with Locations((12.28, -112.5325)):
            Rectangle(SKETCH4_W, SKETCH4_H)
    # profile 37 of 68: a face of its own
    with BuildSketch(Plane.XZ):
        with Locations((12.28, -87.47)):
            Rectangle(SKETCH4_W, SKETCH4_H)
    # profile 38 of 68: a face of its own
    with BuildSketch(Plane.XZ):
        with Locations((37.3425, -87.47)):
            Rectangle(SKETCH4_W, SKETCH4_H)
    # profile 39 of 68: a face of its own
    with BuildSketch(Plane.XZ):
        with Locations((62.405, -87.47)):
            Rectangle(SKETCH4_W, SKETCH4_H)
    # profile 40 of 68: a face of its own
    with BuildSketch(Plane.XZ):
        with Locations((87.4675, -87.47)):
            Rectangle(SKETCH4_W, SKETCH4_H)
    # profile 41 of 68: a face of its own
    with BuildSketch(Plane.XZ):
        with Locations((112.53, -87.47)):
            Rectangle(SKETCH4_W, SKETCH4_H)
    # profile 42 of 68: a face of its own
    with BuildSketch(Plane.XZ):
        with Locations((137.5925, -87.47)):
            Rectangle(SKETCH4_W, SKETCH4_H)
    # profile 43 of 68: a face of its own
    with BuildSketch(Plane.XZ):
        with Locations((162.655, -87.47)):
            Rectangle(SKETCH4_W, SKETCH4_H)
    # profile 44 of 68: a face of its own
    with BuildSketch(Plane.XZ):
        with Locations((187.7175, -87.47)):
            Rectangle(SKETCH4_W, SKETCH4_H)
    # profile 45 of 68: a face of its own
    with BuildSketch(Plane.XZ):
        with Locations((187.7175, -62.4075)):
            Rectangle(SKETCH4_W, SKETCH4_H)
    # profile 46 of 68: a face of its own
    with BuildSketch(Plane.XZ):
        with Locations((162.655, -62.4075)):
            Rectangle(SKETCH4_W, SKETCH4_H)
    # profile 47 of 68: a face of its own
    with BuildSketch(Plane.XZ):
        with Locations((137.5925, -62.4075)):
            Rectangle(SKETCH4_W, SKETCH4_H)
    # profile 48 of 68: a face of its own
    with BuildSketch(Plane.XZ):
        with Locations((112.53, -62.4075)):
            Rectangle(SKETCH4_W, SKETCH4_H)
    # profile 49 of 68: a face of its own
    with BuildSketch(Plane.XZ):
        with Locations((87.4675, -62.4075)):
            Rectangle(SKETCH4_W, SKETCH4_H)
    # profile 50 of 68: a face of its own
    with BuildSketch(Plane.XZ):
        with Locations((62.405, -62.4075)):
            Rectangle(SKETCH4_W, SKETCH4_H)
    # profile 51 of 68: a face of its own
    with BuildSketch(Plane.XZ):
        with Locations((37.3425, -62.4075)):
            Rectangle(SKETCH4_W, SKETCH4_H)
    # profile 52 of 68: a face of its own
    with BuildSketch(Plane.XZ):
        with Locations((12.28, -62.4075)):
            Rectangle(SKETCH4_W, SKETCH4_H)
    # profile 53 of 68: a face of its own
    with BuildSketch(Plane.XZ):
        with Locations((12.28, -37.345)):
            Rectangle(SKETCH4_W, SKETCH4_H)
    # profile 54 of 68: a face of its own
    with BuildSketch(Plane.XZ):
        with Locations((37.3425, -37.345)):
            Rectangle(SKETCH4_W, SKETCH4_H)
    # profile 55 of 68: a face of its own
    with BuildSketch(Plane.XZ):
        with Locations((62.405, -37.345)):
            Rectangle(SKETCH4_W, SKETCH4_H)
    # profile 56 of 68: a face of its own
    with BuildSketch(Plane.XZ):
        with Locations((87.4675, -37.345)):
            Rectangle(SKETCH4_W, SKETCH4_H)
    # profile 57 of 68: a face of its own
    with BuildSketch(Plane.XZ):
        with Locations((112.53, -37.345)):
            Rectangle(SKETCH4_W, SKETCH4_H)
    # profile 58 of 68: a face of its own
    with BuildSketch(Plane.XZ):
        with Locations((137.5925, -37.345)):
            Rectangle(SKETCH4_W, SKETCH4_H)
    # profile 59 of 68: a face of its own
    with BuildSketch(Plane.XZ):
        with Locations((162.655, -37.345)):
            Rectangle(SKETCH4_W, SKETCH4_H)
    # profile 60 of 68: a face of its own
    with BuildSketch(Plane.XZ):
        with Locations((187.7175, -37.345)):
            Rectangle(SKETCH4_W, SKETCH4_H)
    # profile 61 of 68: a face of its own
    with BuildSketch(Plane.XZ):
        with Locations((187.7175, -12.2825)):
            Rectangle(SKETCH4_W, SKETCH4_H)
    # profile 62 of 68: a face of its own
    with BuildSketch(Plane.XZ):
        with Locations((162.655, -12.2825)):
            Rectangle(SKETCH4_W, SKETCH4_H)
    # profile 63 of 68: a face of its own
    with BuildSketch(Plane.XZ):
        with Locations((137.5925, -12.2825)):
            Rectangle(SKETCH4_W, SKETCH4_H)
    # profile 64 of 68: a face of its own
    with BuildSketch(Plane.XZ):
        with Locations((112.53, -12.2825)):
            Rectangle(SKETCH4_W, SKETCH4_H)
    # profile 65 of 68: a face of its own
    with BuildSketch(Plane.XZ):
        with Locations((87.4675, -12.2825)):
            Rectangle(SKETCH4_W, SKETCH4_H)
    # profile 66 of 68: a face of its own
    with BuildSketch(Plane.XZ):
        with Locations((62.405, -12.2825)):
            Rectangle(SKETCH4_W, SKETCH4_H)
    # profile 67 of 68: a face of its own
    with BuildSketch(Plane.XZ):
        with Locations((12.28, -12.2825)):
            Rectangle(SKETCH4_W, SKETCH4_H)
    # profile 68 of 68: a face of its own
    with BuildSketch(Plane.XZ):
        with Locations((37.3425, -12.2825)):
            Rectangle(SKETCH4_W, SKETCH4_H)
    extrude(amount=-CUT_EXTRUDE2_DEPTH, mode=Mode.SUBTRACT)

    # Cut-Extrude3 outline → Cut-Extrude3 (cut)
    with BuildSketch(Plane.XZ.offset(CUT_EXTRUDE3_START)):
        with Locations((100, -100)):
            Rectangle(CUT_EXTRUDE3_OUTLINE_W, CUT_EXTRUDE3_OUTLINE_H)
    extrude(amount=CUT_EXTRUDE3_DEPTH, mode=Mode.SUBTRACT)

    # Cut-Extrude3 2 outline → Cut-Extrude3 2 (cut)
    with BuildSketch(Plane.XZ.offset(CUT_EXTRUDE3_START_2)):
        with Locations((12.28125, -187.71875)):
            Rectangle(CUT_EXTRUDE3_2_OUTLINE_W, CUT_EXTRUDE3_2_OUTLINE_H)
        with Locations((12.28125, -137.59375)):
            Rectangle(CUT_EXTRUDE3_2_OUTLINE_W, CUT_EXTRUDE3_2_OUTLINE_H)
        with Locations((62.40625, -187.71875)):
            Rectangle(CUT_EXTRUDE3_2_OUTLINE_W, CUT_EXTRUDE3_2_OUTLINE_H)
        with Locations((12.28125, -87.46875)):
            Rectangle(CUT_EXTRUDE3_2_OUTLINE_W, CUT_EXTRUDE3_2_OUTLINE_H)
        with Locations((112.53125, -187.71875)):
            Rectangle(CUT_EXTRUDE3_2_OUTLINE_W, CUT_EXTRUDE3_2_OUTLINE_H)
        with Locations((12.28125, -37.34375)):
            Rectangle(CUT_EXTRUDE3_2_OUTLINE_W, CUT_EXTRUDE3_2_OUTLINE_H)
        with Locations((162.65625, -187.71875)):
            Rectangle(CUT_EXTRUDE3_2_OUTLINE_W, CUT_EXTRUDE3_2_OUTLINE_H)
        with Locations((37.34375, -12.28125)):
            Rectangle(CUT_EXTRUDE3_2_OUTLINE_W, CUT_EXTRUDE3_2_OUTLINE_H)
        with Locations((187.71875, -162.65625)):
            Rectangle(CUT_EXTRUDE3_2_OUTLINE_W, CUT_EXTRUDE3_2_OUTLINE_H)
        with Locations((87.46875, -12.28125)):
            Rectangle(CUT_EXTRUDE3_2_OUTLINE_W, CUT_EXTRUDE3_2_OUTLINE_H)
        with Locations((187.71875, -112.53125)):
            Rectangle(CUT_EXTRUDE3_2_OUTLINE_W, CUT_EXTRUDE3_2_OUTLINE_H)
        with Locations((137.59375, -12.28125)):
            Rectangle(CUT_EXTRUDE3_2_OUTLINE_W, CUT_EXTRUDE3_2_OUTLINE_H)
        with Locations((187.71875, -62.40625)):
            Rectangle(CUT_EXTRUDE3_2_OUTLINE_W, CUT_EXTRUDE3_2_OUTLINE_H)
        with Locations((187.71875, -12.28125)):
            Rectangle(CUT_EXTRUDE3_2_OUTLINE_W, CUT_EXTRUDE3_2_OUTLINE_H)
        with Locations((62.40625, -87.46875)):
            Rectangle(CUT_EXTRUDE3_2_OUTLINE_W, CUT_EXTRUDE3_2_OUTLINE_H)
        with Locations((112.53125, -87.46875)):
            Rectangle(CUT_EXTRUDE3_2_OUTLINE_W, CUT_EXTRUDE3_2_OUTLINE_H)
        with Locations((162.65625, -87.46875)):
            Rectangle(CUT_EXTRUDE3_2_OUTLINE_W, CUT_EXTRUDE3_2_OUTLINE_H)
        with Locations((37.34375, -62.40625)):
            Rectangle(CUT_EXTRUDE3_2_OUTLINE_W, CUT_EXTRUDE3_2_OUTLINE_H)
        with Locations((87.46875, -62.40625)):
            Rectangle(CUT_EXTRUDE3_2_OUTLINE_W, CUT_EXTRUDE3_2_OUTLINE_H)
        with Locations((137.59375, -62.40625)):
            Rectangle(CUT_EXTRUDE3_2_OUTLINE_W, CUT_EXTRUDE3_2_OUTLINE_H)
        with Locations((62.40625, -37.34375)):
            Rectangle(CUT_EXTRUDE3_2_OUTLINE_W, CUT_EXTRUDE3_2_OUTLINE_H)
        with Locations((112.53125, -37.34375)):
            Rectangle(CUT_EXTRUDE3_2_OUTLINE_W, CUT_EXTRUDE3_2_OUTLINE_H)
        with Locations((162.65625, -37.34375)):
            Rectangle(CUT_EXTRUDE3_2_OUTLINE_W, CUT_EXTRUDE3_2_OUTLINE_H)
        with Locations((37.34375, -162.65625)):
            Rectangle(CUT_EXTRUDE3_2_OUTLINE_W, CUT_EXTRUDE3_2_OUTLINE_H)
        with Locations((87.46875, -162.65625)):
            Rectangle(CUT_EXTRUDE3_2_OUTLINE_W, CUT_EXTRUDE3_2_OUTLINE_H)
        with Locations((137.59375, -162.65625)):
            Rectangle(CUT_EXTRUDE3_2_OUTLINE_W, CUT_EXTRUDE3_2_OUTLINE_H)
        with Locations((62.40625, -137.59375)):
            Rectangle(CUT_EXTRUDE3_2_OUTLINE_W, CUT_EXTRUDE3_2_OUTLINE_H)
        with Locations((112.53125, -137.59375)):
            Rectangle(CUT_EXTRUDE3_2_OUTLINE_W, CUT_EXTRUDE3_2_OUTLINE_H)
        with Locations((162.65625, -137.59375)):
            Rectangle(CUT_EXTRUDE3_2_OUTLINE_W, CUT_EXTRUDE3_2_OUTLINE_H)
        with Locations((37.34375, -112.53125)):
            Rectangle(CUT_EXTRUDE3_2_OUTLINE_W, CUT_EXTRUDE3_2_OUTLINE_H)
        with Locations((87.46875, -112.53125)):
            Rectangle(CUT_EXTRUDE3_2_OUTLINE_W, CUT_EXTRUDE3_2_OUTLINE_H)
        with Locations((137.59375, -112.53125)):
            Rectangle(CUT_EXTRUDE3_2_OUTLINE_W, CUT_EXTRUDE3_2_OUTLINE_H)
    extrude(amount=CUT_EXTRUDE3_2_DEPTH, mode=Mode.SUBTRACT)


solid = part.part
